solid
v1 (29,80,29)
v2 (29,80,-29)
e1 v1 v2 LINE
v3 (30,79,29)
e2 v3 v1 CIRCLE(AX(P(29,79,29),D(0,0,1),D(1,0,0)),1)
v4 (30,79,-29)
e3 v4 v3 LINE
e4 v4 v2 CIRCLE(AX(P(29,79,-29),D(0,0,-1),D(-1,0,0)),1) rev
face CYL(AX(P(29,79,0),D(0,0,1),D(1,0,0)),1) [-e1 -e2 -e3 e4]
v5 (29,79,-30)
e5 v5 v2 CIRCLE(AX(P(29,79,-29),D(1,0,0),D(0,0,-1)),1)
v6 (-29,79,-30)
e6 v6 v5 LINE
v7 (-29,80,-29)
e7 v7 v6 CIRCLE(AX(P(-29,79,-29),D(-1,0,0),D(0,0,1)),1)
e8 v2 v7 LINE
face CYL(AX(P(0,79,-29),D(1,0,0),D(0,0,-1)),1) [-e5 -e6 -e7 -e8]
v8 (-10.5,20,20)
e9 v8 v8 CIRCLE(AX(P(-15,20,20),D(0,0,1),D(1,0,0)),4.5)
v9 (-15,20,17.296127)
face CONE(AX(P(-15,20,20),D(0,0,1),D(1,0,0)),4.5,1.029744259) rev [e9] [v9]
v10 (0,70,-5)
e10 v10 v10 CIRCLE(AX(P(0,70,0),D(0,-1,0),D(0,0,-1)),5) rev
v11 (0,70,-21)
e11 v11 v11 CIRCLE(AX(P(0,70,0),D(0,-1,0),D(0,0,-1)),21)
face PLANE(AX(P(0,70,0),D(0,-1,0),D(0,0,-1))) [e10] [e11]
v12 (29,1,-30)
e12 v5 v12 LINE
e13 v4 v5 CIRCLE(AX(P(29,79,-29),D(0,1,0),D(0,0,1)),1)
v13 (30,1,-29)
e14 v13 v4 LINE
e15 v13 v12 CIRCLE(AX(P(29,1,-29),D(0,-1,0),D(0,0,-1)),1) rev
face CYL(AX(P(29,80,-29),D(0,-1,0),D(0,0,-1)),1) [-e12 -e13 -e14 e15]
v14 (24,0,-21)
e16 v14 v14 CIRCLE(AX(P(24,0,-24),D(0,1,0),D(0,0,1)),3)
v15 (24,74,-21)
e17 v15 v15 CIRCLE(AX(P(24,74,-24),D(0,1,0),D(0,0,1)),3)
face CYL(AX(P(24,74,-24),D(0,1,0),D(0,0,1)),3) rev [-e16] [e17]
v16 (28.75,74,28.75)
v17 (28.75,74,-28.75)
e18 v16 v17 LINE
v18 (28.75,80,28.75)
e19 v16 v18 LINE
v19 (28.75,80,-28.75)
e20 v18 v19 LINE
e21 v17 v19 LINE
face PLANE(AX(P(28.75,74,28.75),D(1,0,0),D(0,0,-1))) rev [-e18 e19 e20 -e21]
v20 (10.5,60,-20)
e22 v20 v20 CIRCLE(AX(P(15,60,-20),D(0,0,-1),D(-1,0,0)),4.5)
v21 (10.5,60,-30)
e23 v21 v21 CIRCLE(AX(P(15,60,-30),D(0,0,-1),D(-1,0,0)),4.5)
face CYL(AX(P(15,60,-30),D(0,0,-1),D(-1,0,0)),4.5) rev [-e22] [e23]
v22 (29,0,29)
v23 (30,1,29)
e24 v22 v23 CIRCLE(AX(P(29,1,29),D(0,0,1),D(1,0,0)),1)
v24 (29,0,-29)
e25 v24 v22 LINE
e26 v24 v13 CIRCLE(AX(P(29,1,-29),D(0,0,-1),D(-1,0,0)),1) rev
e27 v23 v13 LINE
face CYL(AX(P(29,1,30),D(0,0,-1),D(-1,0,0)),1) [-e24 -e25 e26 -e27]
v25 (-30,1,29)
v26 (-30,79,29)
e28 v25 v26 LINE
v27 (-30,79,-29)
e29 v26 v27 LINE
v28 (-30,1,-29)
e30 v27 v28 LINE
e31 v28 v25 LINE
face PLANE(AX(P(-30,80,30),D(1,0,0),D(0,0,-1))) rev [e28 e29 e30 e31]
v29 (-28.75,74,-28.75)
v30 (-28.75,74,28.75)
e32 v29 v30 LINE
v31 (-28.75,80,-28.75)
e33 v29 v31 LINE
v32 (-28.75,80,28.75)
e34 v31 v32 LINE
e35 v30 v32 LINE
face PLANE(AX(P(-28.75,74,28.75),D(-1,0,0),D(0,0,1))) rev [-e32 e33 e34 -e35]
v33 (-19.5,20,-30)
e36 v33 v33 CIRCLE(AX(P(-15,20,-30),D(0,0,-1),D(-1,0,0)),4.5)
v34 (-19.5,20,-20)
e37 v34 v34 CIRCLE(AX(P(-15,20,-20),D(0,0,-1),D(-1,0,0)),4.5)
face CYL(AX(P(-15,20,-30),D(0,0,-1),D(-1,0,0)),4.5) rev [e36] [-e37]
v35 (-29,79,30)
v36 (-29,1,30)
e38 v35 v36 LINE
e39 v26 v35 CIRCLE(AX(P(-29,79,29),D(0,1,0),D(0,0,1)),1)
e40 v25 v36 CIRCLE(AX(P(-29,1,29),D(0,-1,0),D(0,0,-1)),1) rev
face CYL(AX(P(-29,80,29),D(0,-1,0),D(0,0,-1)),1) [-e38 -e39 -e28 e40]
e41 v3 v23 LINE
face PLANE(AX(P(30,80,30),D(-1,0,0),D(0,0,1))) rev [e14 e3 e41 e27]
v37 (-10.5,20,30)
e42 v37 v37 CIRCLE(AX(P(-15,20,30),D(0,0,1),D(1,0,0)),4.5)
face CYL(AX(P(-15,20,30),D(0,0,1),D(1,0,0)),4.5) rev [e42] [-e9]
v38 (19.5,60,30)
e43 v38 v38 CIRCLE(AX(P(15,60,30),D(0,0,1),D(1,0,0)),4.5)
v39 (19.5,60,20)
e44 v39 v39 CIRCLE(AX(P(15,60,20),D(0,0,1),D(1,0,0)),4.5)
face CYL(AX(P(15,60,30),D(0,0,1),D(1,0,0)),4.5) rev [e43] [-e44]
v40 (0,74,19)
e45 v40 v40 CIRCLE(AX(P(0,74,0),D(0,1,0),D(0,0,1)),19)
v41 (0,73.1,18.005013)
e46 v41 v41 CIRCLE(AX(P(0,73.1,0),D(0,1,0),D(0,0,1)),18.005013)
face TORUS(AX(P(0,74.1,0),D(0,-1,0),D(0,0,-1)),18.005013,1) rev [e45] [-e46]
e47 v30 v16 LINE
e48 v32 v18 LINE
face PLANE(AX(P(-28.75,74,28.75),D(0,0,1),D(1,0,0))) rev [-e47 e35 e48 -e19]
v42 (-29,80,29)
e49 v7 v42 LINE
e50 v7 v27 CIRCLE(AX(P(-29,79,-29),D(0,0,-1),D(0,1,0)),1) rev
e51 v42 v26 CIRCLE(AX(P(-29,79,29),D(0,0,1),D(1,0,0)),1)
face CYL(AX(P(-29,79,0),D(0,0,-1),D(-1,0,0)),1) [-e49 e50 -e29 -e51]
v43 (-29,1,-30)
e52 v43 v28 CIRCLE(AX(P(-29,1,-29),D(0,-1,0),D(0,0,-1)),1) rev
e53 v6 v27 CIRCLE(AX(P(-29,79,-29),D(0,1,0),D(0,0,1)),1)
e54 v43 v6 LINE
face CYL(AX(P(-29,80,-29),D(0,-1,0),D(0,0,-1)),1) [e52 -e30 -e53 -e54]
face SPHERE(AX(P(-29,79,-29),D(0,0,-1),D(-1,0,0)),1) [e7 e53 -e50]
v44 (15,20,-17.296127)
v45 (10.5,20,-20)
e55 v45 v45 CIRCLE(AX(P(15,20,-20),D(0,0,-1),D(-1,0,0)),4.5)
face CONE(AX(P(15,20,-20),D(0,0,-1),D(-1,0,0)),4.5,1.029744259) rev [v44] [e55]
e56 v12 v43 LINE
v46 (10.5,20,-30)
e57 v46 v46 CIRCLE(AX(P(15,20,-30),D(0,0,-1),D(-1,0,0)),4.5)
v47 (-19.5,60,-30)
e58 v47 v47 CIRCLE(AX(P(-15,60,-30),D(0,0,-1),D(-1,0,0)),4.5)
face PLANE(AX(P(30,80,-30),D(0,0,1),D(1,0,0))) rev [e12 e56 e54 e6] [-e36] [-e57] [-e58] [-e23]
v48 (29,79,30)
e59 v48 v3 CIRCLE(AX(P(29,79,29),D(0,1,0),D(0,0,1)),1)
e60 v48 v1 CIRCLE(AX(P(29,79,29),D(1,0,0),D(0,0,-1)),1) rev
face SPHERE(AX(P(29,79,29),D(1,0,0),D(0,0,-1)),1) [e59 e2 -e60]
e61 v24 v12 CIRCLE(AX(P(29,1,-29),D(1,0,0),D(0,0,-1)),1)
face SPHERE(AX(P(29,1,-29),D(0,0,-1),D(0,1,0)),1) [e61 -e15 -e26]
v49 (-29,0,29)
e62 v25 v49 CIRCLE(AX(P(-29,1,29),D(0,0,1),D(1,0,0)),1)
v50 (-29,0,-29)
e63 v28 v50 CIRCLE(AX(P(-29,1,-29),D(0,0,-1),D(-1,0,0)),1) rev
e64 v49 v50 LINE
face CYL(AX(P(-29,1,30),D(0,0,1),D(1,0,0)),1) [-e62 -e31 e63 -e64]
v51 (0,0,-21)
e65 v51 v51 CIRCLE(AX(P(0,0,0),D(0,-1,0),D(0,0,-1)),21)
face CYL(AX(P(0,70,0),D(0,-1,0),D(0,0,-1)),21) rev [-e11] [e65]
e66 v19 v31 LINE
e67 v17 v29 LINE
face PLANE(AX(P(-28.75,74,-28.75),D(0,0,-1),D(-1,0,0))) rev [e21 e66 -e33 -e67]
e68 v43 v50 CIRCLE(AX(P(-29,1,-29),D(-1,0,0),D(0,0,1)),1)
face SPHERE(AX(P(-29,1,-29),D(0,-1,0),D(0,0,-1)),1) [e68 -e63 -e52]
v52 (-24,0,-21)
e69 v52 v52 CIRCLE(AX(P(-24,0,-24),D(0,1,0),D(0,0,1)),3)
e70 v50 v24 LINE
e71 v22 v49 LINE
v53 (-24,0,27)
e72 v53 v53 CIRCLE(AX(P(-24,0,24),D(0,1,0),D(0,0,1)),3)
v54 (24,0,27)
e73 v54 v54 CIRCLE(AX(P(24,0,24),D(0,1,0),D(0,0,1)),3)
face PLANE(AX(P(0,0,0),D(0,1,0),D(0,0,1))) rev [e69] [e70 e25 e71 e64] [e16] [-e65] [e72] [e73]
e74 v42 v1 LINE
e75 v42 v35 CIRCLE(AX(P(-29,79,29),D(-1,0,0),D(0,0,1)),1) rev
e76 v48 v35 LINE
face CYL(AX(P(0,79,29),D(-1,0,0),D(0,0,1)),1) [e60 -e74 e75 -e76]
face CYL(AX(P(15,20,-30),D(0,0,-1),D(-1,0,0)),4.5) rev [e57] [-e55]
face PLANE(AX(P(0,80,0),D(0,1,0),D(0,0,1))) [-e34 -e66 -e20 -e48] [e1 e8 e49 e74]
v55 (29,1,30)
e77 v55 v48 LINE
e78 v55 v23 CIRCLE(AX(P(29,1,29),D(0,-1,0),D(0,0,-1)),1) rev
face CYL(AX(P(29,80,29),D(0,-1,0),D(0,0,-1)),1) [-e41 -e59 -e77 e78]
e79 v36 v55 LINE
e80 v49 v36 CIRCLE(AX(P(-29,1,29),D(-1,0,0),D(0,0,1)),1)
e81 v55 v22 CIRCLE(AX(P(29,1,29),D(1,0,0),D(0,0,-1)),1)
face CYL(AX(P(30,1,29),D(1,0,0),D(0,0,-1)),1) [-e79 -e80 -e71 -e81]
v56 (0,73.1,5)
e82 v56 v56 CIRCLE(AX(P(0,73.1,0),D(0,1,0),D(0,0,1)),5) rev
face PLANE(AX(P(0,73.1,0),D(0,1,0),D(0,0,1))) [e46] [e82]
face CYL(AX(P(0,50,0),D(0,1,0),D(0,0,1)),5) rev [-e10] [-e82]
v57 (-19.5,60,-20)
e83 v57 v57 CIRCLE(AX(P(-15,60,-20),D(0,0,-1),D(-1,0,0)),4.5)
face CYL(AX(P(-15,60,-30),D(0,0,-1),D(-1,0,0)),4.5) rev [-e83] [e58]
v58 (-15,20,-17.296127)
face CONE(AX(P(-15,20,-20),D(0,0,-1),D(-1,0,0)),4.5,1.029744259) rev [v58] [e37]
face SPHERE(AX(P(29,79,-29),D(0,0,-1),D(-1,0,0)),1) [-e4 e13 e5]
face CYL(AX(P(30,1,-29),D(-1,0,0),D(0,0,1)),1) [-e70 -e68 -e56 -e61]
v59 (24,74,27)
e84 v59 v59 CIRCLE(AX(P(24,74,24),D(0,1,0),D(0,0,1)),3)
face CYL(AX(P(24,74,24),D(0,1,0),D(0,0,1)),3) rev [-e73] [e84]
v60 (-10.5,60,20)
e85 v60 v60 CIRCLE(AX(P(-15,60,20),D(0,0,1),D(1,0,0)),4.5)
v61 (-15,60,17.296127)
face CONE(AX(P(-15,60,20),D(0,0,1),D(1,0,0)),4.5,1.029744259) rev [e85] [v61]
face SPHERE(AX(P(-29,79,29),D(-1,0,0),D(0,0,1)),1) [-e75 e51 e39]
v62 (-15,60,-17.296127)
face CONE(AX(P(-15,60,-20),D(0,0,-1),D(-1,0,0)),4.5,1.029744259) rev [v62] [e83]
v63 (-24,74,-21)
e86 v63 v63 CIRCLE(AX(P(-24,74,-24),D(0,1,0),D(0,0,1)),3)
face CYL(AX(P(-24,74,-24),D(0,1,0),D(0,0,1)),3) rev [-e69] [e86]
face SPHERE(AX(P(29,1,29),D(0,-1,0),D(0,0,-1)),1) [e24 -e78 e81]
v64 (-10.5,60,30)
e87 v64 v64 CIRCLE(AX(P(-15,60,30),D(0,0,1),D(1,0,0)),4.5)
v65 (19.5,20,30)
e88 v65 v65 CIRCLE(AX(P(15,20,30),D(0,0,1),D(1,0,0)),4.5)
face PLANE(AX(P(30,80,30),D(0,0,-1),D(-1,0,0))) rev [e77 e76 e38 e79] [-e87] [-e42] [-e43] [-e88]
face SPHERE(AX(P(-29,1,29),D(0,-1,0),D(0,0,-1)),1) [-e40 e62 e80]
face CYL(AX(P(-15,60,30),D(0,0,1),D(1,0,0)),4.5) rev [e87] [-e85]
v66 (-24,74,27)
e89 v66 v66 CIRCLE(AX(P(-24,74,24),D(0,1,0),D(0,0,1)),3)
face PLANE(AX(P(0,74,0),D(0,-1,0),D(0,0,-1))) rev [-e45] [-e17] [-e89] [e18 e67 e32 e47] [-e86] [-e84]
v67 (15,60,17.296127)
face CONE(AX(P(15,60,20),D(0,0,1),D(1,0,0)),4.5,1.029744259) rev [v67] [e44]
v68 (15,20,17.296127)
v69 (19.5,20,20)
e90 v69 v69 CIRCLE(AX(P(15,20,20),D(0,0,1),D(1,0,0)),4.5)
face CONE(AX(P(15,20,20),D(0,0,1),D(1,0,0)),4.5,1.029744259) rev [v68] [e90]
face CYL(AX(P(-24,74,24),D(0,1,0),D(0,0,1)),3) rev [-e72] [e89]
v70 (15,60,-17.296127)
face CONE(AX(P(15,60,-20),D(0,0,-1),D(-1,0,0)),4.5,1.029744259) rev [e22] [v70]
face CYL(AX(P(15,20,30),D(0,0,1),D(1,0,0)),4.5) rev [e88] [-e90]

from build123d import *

# Parameters (mm, degrees)
SZKIC1_W                     = 60
SZKIC1_H                     = 60
DODANIE_WYCI_GNI_CIE1_DEPTH  = 80
SZKIC2_W                     = 57.5
SZKIC2_H                     = 57.5
WYTNIJ_WYCI_GNI_CIE1_DEPTH   = 6
SZKIC3_R                     = 5
WYTNIJ_WYCI_GNI_CIE2_DEPTH   = 24
SZKIC4_R                     = 19
WYTNIJ_WYCI_GNI_CIE3_DEPTH   = 0.9
ZAOKR_GLENIE1_R              = 1
OTWORY_USTALAJ_CE_6_0MM1_D   = 6
SZKIC8_R                     = 21
WYTNIJ_WYCI_GNI_CIE5_DEPTH   = 70
ZAOKR_GLENIE2_R              = 1
OTW_R_POD_RUB_M81_AT_2_COUNT = 2
OTW_R_POD_RUB_M81_AT_2_PITCH = 30
OTW_R_POD_RUB_M81_AT_3_COUNT = 2
OTW_R_POD_RUB_M81_AT_3_PITCH = 50
OTW_R_POD_RUB_M81_AT_4_COUNT = 2
OTW_R_POD_RUB_M81_AT_4_PITCH = 40


with BuildPart() as part:
    # Szkic1 → Dodanie-wyciągnięcie1 (new body)
    with BuildSketch(Plane(origin=(0, 0, 0), x_dir=(1, 0, 0), z_dir=(0, 1, 0))):
        Rectangle(SZKIC1_W, SZKIC1_H)
    extrude(amount=DODANIE_WYCI_GNI_CIE1_DEPTH)

    # Szkic2 → Wytnij-wyciągnięcie1 (cut)
    with BuildSketch(Plane(origin=(0, 80, 0), x_dir=(1, 0, 0), z_dir=(0, 1, 0))):
        Rectangle(SZKIC2_W, SZKIC2_H)
    extrude(amount=-WYTNIJ_WYCI_GNI_CIE1_DEPTH, mode=Mode.SUBTRACT)

    # Szkic3 → Wytnij-wyciągnięcie2 (cut)
    with BuildSketch(Plane(origin=(0, 74, 0), x_dir=(1, 0, 0), z_dir=(0, 1, 0))):
        with Locations(Location((0, 0, 0), (0, 0, 270))):
            Circle(SZKIC3_R)
    extrude(amount=-WYTNIJ_WYCI_GNI_CIE2_DEPTH, mode=Mode.SUBTRACT)

    # Szkic4 → Wytnij-wyciągnięcie3 (cut)
    with BuildSketch(Plane(origin=(0, 74, 0), x_dir=(1, 0, 0), z_dir=(0, 1, 0))):
        with Locations(Location((0, 0, 0), (0, 0, 270))):
            Circle(SZKIC4_R)
    extrude(amount=-WYTNIJ_WYCI_GNI_CIE3_DEPTH, mode=Mode.SUBTRACT)

    # Zaokrąglenie1
    # the kernel refuses this fillet: 1 mm, written as the material it adds along each edge
    with BuildSketch(Plane(origin=(0, 73.1, 0), x_dir=(0, 0, 1), z_dir=(-1, 0, 0))) as zaokr_glenie1_piece_1:
        with BuildLine():
            CenterArc((18.005012563, 1), ZAOKR_GLENIE1_R, 270, 84.260829523)
            Line((18.005012563, 0), (18.005012563, -0.02))
            Line((18.005012563, -0.02), (19, -0.02))
            Line((19, -0.02), (19.02, 0))
            ThreePointArc((19.02, 0), (19.02, 0.45), (19.019899749, 0.898))
            Line((19.019899749, 0.898), (19, 0.9))
        make_face()
    revolve(axis=Axis((0, 73.1, 0), (0, 1, 0)))

    # Otwory ustalające Ø6.0mm1 (through all)
    with Locations(Plane(origin=(0, 74, 0), x_dir=(1, 0, 0), z_dir=(0, 1, 0))):
        with Locations((-24, 24), (24, 24), (24, -24), (-24, -24)):
            Hole(OTWORY_USTALAJ_CE_6_0MM1_D / 2)

    # Szkic8 → Wytnij-wyciągnięcie5 (cut)
    with BuildSketch(Plane.XZ):
        with Locations(Location((0, 0, 0), (0, 0, 270))):
            Circle(SZKIC8_R)
    extrude(amount=-WYTNIJ_WYCI_GNI_CIE5_DEPTH, mode=Mode.SUBTRACT)

    # Zaokrąglenie2
    zaokr_glenie2_edges = [part.edges().sort_by_distance(p)[0] for p in [
        (30, 80, 0),
        (0, 80, -30),
        (-30, 80, 0),
        (0, 0, -30),
        (30, 0, 0),
        (0, 0, 30),
        (-30, 0, 0),
        (-30, 40, -30),
        (30, 40, -30),
        (30, 40, 30),
        (-30, 40, 30),
        (0, 80, 30),
    ]]
    fillet(zaokr_glenie2_edges, radius=ZAOKR_GLENIE2_R)

    # Szkic11 → Otwór pod śrubę M81 (revolve, cut)
    with BuildSketch(Plane(origin=(15, 60, -30), x_dir=(0, 1, 0), z_dir=(1, 0, 0))):
        Polygon((0, 0), (0, 12.703872786), (4.5, 10), (4.5, 0), align=None)
    otw_r_pod_rub_m81 = revolve(axis=Axis((15, 60, -36.35), (0, 0, 1)), mode=Mode.SUBTRACT)

    # Otwór pod śrubę M81 at 2: Otwór pod śrubę M81 ×2
    with Locations(*[(-i * OTW_R_POD_RUB_M81_AT_2_PITCH, 0, 0) for i in range(1, OTW_R_POD_RUB_M81_AT_2_COUNT)]):
        add(otw_r_pod_rub_m81, mode=Mode.SUBTRACT)

    # Otwór pod śrubę M81 at 3: Otwór pod śrubę M81 ×2
    with Locations(*[Vector(-0.6, -0.8000000000000002, 0) * (i * OTW_R_POD_RUB_M81_AT_3_PITCH) for i in range(1, OTW_R_POD_RUB_M81_AT_3_COUNT)]):
        add(otw_r_pod_rub_m81, mode=Mode.SUBTRACT)

    # Otwór pod śrubę M81 at 4: Otwór pod śrubę M81 ×2
    with Locations(*[(0, -i * OTW_R_POD_RUB_M81_AT_4_PITCH, 0) for i in range(1, OTW_R_POD_RUB_M81_AT_4_COUNT)]):
        add(otw_r_pod_rub_m81, mode=Mode.SUBTRACT)

    # Lustro1: Otwór pod śrubę M81 across plane
    add(otw_r_pod_rub_m81.mirror(Plane.XY), mode=Mode.SUBTRACT)

    # Lustro1 copy 1 sketch → Lustro1 copy 1 (revolve, cut)
    with BuildSketch(Plane(origin=(-15, 60, 30), x_dir=(0, 1, 0), z_dir=(1, 0, 0))):
        Polygon((0, 0), (0, -12.703872786), (4.5, -10), (4.5, 0), align=None)
    revolve(axis=Axis((-15, 60, 36.35), (0, 0, 1)), mode=Mode.SUBTRACT)

    # Lustro1 copy 2 sketch → Lustro1 copy 2 (revolve, cut)
    with BuildSketch(Plane(origin=(-15, 20, 30), x_dir=(0, 1, 0), z_dir=(1, 0, 0))):
        Polygon((0, 0), (0, -12.703872786), (4.5, -10), (4.5, 0), align=None)
    revolve(axis=Axis((-15, 20, 36.35), (0, 0, 1)), mode=Mode.SUBTRACT)

    # Lustro1 copy 3 sketch → Lustro1 copy 3 (revolve, cut)
    with BuildSketch(Plane(origin=(15, 20, 30), x_dir=(0, 1, 0), z_dir=(1, 0, 0))):
        Polygon((0, 0), (0, -12.703872786), (4.5, -10), (4.5, 0), align=None)
    revolve(axis=Axis((15, 20, 36.35), (0, 0, 1)), mode=Mode.SUBTRACT)


solid = part.part
